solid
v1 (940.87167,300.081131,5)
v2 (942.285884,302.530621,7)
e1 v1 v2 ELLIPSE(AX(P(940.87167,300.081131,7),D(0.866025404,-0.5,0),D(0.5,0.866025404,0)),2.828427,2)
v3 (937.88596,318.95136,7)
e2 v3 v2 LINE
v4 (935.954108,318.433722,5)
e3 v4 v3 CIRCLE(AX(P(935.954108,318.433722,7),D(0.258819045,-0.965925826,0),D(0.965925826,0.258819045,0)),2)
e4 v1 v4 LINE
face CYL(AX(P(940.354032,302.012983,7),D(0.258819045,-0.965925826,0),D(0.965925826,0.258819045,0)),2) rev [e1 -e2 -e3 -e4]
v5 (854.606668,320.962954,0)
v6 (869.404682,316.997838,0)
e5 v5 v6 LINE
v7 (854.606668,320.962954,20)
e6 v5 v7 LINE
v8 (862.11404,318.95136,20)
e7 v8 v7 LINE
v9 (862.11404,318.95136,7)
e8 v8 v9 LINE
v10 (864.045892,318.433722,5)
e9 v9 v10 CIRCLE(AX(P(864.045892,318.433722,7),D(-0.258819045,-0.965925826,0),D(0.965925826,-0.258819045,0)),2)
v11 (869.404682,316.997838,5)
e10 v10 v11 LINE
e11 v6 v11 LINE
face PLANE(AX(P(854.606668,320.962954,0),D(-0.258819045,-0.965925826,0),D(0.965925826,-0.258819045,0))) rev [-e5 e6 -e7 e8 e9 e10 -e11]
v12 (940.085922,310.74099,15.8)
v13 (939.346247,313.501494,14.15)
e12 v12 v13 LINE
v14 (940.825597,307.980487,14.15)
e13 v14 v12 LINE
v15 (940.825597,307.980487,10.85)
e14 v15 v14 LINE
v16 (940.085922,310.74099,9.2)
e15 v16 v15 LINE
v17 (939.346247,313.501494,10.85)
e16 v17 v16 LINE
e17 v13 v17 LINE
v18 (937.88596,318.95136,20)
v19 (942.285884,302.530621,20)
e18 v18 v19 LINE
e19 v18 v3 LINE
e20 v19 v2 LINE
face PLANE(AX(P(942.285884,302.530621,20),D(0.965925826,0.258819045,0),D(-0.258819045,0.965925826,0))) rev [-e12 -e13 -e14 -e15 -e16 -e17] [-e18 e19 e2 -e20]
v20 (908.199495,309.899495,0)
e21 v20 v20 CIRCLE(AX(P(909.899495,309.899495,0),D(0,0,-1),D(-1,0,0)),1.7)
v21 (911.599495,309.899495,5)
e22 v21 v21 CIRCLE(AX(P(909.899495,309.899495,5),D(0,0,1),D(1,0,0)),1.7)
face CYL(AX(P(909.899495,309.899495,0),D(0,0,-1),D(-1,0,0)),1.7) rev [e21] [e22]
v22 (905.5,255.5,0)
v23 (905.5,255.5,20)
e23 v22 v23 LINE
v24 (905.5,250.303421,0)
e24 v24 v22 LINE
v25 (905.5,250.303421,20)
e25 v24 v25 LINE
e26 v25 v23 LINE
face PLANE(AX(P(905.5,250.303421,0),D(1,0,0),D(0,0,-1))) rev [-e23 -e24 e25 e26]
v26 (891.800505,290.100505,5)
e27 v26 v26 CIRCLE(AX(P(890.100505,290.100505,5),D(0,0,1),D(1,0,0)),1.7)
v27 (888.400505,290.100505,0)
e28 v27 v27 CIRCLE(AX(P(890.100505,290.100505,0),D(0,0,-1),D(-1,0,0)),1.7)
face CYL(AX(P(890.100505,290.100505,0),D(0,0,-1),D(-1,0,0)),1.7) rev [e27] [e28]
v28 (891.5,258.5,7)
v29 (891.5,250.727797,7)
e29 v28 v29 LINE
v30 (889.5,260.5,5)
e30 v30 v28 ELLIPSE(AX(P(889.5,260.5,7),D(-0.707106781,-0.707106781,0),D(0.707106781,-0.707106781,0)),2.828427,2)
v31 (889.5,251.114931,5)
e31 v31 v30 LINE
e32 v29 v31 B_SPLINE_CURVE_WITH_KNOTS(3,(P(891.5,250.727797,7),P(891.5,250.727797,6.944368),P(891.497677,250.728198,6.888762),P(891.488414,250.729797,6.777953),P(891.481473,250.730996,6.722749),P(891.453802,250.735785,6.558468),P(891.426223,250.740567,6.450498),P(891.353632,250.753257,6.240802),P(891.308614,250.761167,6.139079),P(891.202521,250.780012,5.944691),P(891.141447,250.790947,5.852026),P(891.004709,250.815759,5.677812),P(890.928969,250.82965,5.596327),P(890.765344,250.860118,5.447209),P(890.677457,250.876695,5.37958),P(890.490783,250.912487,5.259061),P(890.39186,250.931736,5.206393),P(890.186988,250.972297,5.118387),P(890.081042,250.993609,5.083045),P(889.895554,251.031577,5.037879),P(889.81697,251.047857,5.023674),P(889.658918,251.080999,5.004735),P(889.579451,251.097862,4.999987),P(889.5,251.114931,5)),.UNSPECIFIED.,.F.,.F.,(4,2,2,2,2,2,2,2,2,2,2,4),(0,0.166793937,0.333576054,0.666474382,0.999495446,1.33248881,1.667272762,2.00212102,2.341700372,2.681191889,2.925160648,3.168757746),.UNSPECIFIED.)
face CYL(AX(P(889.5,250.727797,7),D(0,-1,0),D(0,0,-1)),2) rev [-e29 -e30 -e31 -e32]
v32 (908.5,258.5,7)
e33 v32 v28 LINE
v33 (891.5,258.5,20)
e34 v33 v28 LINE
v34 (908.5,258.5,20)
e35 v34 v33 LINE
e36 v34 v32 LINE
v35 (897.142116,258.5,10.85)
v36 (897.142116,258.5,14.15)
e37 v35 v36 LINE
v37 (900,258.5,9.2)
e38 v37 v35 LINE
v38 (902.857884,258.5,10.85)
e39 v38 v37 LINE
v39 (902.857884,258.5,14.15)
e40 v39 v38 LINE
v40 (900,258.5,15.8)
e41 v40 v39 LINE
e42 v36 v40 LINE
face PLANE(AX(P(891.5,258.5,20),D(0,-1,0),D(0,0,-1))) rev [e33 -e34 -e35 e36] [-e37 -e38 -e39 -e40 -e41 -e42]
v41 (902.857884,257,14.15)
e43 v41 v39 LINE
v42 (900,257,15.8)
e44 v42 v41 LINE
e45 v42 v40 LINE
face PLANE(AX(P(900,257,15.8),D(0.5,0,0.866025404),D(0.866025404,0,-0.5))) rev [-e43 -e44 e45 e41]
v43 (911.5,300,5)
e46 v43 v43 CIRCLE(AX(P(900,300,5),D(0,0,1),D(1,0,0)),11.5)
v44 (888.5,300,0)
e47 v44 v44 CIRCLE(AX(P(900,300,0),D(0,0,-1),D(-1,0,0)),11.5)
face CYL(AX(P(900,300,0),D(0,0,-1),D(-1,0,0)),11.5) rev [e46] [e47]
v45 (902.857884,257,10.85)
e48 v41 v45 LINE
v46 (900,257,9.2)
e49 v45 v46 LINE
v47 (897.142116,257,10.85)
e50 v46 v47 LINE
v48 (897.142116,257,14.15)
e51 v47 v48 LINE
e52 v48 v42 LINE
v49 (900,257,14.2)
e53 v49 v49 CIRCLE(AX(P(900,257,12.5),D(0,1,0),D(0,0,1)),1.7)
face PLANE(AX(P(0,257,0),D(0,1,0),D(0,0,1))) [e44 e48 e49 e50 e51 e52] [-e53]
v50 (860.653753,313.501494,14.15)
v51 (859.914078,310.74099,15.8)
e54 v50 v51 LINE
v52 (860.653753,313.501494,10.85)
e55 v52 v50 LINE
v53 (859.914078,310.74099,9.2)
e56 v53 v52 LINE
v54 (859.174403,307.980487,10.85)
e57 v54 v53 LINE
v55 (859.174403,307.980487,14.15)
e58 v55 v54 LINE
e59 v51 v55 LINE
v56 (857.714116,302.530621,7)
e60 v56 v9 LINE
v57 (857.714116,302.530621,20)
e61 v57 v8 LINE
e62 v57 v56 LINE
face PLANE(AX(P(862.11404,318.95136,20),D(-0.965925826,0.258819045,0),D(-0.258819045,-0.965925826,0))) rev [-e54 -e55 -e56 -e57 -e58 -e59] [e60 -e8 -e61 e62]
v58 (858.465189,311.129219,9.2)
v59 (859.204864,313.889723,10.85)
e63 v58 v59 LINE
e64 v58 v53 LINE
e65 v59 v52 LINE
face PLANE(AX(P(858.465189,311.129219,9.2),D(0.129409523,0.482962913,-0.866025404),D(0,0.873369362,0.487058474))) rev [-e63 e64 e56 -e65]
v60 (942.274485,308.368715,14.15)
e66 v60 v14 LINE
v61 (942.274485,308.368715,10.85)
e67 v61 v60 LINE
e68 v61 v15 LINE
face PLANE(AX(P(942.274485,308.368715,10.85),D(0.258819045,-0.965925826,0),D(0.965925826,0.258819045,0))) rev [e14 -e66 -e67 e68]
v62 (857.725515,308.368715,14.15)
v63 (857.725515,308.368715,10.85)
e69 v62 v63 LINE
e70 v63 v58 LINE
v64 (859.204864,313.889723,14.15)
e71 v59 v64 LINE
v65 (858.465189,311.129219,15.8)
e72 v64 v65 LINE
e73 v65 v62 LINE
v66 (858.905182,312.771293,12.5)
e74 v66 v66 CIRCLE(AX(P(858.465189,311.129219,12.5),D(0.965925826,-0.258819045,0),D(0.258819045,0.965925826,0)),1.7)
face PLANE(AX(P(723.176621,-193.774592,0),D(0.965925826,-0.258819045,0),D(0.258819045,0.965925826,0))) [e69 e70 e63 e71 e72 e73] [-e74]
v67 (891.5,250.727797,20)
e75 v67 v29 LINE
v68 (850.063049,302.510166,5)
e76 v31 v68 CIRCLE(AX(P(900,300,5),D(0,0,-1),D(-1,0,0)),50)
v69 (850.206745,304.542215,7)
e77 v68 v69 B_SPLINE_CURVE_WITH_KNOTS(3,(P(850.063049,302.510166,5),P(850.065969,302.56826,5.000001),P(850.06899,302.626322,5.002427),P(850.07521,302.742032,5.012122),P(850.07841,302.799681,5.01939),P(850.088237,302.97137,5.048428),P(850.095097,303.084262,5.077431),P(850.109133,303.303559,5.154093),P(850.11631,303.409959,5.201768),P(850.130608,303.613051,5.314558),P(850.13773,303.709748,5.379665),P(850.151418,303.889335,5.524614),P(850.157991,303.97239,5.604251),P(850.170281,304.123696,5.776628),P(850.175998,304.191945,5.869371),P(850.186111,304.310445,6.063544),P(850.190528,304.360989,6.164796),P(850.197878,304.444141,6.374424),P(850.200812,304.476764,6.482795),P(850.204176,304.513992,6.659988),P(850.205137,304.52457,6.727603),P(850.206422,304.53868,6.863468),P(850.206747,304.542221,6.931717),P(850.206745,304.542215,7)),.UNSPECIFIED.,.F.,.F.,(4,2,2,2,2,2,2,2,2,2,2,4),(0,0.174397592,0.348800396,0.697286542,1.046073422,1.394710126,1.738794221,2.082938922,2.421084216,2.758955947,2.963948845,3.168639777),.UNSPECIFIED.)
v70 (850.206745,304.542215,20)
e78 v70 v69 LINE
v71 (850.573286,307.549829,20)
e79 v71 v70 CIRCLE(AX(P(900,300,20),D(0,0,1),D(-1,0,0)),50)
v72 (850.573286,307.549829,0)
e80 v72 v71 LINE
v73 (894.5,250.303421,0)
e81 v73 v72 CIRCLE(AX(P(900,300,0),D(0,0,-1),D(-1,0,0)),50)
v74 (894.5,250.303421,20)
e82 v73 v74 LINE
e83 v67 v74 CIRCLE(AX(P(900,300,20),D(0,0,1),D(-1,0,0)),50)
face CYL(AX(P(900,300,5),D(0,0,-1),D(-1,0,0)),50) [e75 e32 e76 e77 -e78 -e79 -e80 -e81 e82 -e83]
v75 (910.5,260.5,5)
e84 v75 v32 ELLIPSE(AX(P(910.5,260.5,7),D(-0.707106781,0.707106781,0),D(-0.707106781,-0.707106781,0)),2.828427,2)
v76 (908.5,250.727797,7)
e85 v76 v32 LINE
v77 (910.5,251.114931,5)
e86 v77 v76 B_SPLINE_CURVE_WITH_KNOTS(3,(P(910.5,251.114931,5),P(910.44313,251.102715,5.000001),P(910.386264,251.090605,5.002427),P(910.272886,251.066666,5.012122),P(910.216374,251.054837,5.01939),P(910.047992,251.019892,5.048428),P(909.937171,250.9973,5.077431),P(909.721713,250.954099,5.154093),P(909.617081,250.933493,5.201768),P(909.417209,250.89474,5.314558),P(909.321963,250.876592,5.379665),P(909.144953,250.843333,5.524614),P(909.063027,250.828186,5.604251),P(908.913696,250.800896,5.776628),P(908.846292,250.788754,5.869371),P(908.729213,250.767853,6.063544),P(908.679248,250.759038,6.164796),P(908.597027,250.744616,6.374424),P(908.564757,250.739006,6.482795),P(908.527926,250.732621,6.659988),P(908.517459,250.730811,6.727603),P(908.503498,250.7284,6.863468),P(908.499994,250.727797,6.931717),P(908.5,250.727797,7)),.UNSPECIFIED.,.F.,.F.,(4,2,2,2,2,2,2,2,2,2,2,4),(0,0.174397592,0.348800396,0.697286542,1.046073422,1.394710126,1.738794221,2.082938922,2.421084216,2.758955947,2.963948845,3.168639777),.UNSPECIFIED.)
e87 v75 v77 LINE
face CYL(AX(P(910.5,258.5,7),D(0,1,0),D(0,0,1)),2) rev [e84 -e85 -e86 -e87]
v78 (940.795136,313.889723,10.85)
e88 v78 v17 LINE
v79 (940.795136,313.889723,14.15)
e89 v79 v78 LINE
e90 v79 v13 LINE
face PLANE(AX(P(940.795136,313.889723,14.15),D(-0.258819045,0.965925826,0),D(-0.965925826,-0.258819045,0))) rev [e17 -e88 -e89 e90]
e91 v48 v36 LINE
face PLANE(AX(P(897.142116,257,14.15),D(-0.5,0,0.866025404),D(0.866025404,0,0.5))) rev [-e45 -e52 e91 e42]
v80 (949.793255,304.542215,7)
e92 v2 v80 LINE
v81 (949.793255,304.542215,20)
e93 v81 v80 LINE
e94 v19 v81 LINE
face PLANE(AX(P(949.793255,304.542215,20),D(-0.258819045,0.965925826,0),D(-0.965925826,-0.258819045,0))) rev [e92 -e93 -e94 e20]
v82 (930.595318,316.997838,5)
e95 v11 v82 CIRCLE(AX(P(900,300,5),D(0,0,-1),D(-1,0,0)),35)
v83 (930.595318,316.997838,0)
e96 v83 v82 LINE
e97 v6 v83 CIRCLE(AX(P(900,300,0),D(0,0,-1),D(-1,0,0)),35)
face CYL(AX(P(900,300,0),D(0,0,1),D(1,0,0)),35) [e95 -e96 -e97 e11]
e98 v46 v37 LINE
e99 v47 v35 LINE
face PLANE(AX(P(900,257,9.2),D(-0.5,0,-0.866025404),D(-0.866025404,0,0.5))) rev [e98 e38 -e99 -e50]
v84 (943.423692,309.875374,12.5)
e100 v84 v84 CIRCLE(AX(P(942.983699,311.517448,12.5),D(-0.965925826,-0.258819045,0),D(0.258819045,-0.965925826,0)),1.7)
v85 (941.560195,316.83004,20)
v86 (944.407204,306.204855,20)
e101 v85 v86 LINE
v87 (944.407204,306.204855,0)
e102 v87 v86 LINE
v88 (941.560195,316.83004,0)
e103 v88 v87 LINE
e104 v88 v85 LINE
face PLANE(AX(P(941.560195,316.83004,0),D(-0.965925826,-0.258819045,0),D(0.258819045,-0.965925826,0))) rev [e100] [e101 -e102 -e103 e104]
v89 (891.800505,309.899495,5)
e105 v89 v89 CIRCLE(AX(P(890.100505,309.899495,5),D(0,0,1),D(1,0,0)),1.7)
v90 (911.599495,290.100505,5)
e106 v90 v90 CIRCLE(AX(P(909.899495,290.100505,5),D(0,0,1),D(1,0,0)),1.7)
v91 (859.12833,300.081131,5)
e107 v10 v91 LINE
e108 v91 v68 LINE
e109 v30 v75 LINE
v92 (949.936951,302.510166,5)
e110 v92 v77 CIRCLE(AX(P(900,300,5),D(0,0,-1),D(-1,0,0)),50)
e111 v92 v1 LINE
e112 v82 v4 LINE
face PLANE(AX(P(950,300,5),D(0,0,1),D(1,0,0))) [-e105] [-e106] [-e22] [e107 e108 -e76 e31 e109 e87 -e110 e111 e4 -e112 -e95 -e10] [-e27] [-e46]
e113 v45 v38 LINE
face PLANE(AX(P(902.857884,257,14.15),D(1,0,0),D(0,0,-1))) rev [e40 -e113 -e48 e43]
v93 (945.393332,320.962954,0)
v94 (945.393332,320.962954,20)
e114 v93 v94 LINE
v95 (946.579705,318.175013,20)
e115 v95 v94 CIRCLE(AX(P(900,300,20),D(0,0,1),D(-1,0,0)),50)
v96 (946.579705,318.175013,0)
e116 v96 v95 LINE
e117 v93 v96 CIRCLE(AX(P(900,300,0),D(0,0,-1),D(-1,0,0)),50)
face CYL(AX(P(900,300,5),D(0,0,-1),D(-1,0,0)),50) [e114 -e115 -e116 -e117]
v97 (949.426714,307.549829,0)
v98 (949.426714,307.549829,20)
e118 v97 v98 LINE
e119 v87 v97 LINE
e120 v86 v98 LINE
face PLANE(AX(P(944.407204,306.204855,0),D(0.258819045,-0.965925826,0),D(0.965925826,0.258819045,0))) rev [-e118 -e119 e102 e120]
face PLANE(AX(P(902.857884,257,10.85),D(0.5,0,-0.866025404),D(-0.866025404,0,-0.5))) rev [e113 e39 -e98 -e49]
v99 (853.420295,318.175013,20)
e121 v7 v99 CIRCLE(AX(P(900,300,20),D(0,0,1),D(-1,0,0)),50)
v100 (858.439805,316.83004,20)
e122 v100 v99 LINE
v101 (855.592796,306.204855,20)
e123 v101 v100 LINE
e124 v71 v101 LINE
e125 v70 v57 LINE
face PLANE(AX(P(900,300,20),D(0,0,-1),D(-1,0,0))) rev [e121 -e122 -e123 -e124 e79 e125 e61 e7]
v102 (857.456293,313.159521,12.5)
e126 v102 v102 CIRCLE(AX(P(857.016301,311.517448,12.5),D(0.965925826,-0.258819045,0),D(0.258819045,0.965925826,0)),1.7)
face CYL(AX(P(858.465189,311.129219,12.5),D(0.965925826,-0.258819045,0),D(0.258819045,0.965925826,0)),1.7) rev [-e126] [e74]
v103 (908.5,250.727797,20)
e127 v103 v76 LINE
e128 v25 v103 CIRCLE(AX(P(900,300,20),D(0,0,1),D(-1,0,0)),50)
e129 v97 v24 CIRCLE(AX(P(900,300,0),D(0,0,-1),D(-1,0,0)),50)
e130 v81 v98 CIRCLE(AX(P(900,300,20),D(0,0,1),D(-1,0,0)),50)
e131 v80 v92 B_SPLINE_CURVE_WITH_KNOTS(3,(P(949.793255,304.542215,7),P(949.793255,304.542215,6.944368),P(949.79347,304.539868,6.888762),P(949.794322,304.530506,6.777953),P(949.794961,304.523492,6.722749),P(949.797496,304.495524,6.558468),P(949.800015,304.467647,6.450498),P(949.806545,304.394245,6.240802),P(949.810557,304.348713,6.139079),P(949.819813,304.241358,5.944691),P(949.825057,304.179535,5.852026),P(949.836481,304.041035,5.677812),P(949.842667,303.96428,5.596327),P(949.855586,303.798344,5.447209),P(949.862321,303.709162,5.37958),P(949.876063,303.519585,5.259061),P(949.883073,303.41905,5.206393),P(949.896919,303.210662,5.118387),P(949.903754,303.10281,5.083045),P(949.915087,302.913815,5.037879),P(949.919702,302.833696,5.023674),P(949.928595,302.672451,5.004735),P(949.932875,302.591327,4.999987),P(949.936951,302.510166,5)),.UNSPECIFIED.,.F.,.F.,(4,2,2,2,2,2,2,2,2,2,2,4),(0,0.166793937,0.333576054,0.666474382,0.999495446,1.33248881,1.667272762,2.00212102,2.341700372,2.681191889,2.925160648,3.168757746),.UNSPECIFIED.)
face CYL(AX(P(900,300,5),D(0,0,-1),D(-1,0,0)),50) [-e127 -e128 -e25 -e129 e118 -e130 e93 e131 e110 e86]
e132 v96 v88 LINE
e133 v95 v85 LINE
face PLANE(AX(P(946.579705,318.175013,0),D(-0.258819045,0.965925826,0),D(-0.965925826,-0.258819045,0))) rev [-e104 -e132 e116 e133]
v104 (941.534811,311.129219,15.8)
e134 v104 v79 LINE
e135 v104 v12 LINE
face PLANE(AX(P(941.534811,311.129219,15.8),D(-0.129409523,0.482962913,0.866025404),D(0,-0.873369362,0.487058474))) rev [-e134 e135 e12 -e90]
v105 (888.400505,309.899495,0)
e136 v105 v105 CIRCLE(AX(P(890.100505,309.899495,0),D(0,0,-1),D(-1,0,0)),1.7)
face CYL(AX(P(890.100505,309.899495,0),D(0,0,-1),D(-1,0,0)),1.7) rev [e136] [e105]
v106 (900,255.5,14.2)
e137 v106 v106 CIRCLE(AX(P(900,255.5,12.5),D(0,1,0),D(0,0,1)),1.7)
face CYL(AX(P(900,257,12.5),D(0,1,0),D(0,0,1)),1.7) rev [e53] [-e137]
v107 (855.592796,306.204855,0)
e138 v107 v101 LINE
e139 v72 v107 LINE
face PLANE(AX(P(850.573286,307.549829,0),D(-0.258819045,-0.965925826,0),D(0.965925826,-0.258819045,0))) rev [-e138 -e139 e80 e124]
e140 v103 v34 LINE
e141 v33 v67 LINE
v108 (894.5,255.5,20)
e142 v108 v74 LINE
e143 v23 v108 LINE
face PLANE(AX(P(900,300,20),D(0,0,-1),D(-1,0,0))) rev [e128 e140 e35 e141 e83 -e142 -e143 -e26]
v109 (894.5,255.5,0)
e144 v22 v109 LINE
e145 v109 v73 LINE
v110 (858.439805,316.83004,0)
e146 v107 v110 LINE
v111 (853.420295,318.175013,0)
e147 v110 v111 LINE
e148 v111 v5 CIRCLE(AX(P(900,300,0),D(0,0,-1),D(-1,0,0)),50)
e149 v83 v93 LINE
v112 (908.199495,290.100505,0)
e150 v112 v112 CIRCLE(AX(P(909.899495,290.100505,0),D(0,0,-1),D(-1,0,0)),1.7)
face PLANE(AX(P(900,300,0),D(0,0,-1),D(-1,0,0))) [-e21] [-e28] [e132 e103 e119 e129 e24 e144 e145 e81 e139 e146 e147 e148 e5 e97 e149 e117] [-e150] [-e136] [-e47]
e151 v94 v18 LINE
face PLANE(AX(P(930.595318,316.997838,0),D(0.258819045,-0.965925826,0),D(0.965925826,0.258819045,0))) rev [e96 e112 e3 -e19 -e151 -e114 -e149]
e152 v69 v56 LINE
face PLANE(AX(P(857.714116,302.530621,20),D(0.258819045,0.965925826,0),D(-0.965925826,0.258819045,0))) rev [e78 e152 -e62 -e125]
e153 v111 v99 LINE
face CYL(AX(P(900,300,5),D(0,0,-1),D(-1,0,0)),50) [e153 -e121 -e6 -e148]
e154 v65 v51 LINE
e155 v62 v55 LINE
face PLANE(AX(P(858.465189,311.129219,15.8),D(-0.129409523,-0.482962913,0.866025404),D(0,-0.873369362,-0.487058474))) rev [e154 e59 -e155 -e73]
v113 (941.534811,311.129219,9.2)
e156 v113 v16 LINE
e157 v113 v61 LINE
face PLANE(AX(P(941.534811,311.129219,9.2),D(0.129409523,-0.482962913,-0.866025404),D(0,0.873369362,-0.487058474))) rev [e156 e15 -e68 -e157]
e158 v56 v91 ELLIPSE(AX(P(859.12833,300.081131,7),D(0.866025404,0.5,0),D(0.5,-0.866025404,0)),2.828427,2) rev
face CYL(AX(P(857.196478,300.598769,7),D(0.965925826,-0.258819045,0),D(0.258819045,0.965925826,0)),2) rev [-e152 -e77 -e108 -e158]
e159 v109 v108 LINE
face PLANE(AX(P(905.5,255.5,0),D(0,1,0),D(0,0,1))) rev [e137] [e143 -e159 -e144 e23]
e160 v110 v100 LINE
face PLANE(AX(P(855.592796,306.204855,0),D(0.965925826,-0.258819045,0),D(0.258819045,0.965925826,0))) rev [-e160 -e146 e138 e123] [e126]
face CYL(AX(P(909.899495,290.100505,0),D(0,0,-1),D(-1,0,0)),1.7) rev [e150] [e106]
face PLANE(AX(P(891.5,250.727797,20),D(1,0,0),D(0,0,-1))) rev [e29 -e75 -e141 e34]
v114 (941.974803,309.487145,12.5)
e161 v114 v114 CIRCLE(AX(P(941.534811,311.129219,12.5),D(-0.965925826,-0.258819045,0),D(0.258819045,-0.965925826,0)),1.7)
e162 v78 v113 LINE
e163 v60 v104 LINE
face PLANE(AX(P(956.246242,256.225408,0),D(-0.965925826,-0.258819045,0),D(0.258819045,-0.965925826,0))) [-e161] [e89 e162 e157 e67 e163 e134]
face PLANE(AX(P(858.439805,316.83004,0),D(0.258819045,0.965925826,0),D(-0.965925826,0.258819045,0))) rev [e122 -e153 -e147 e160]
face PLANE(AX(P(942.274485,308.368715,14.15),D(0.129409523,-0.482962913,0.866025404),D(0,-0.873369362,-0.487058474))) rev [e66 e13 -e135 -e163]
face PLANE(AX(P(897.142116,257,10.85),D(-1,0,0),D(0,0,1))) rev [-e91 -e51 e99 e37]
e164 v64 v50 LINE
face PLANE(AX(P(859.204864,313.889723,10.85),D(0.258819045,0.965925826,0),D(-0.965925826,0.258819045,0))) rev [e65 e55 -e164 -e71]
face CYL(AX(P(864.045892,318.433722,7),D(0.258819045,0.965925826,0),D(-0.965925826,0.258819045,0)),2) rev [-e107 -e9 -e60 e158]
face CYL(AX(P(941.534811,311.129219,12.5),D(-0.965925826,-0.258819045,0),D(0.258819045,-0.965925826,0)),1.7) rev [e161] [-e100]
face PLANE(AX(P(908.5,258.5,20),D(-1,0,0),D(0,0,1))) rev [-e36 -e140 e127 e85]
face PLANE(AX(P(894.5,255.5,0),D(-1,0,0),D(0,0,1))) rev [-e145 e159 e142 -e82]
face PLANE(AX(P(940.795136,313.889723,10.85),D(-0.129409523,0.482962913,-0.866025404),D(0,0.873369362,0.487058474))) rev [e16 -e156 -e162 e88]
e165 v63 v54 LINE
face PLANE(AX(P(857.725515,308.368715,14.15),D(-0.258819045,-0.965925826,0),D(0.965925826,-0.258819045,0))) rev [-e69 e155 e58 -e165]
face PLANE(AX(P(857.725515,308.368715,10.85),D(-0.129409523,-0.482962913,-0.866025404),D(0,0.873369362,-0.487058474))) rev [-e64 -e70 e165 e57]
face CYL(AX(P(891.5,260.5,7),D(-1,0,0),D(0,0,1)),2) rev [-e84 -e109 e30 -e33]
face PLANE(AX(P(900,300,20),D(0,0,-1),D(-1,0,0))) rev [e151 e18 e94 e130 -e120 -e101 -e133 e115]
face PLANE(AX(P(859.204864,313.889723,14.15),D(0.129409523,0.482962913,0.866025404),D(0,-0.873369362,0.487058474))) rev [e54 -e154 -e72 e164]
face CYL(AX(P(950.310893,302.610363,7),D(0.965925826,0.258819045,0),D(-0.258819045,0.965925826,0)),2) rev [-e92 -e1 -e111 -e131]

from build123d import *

# Parameters (mm, degrees)
CUT_EXTRUDE_1_DEPTH         = 1013.4351831105043
EXTRUDE_START               = 14.999999999999998
EXTRUDE_1_DEPTH             = 14.999999999999998
CUT_EXTRUDE_2_DEPTH         = 1008.5341185289956
EXTRUDE_2_DEPTH             = 14.999999999999998
CUT_EXTRUDE_3_DEPTH         = 1008.5341185289956
EXTRUDE_3_DEPTH             = 14.999999999999998
CUT_EXTRUDE_4_DEPTH         = 1008.5341185289956
CUT_EXTRUDE_5_DEPTH         = 1.5000000000000013
CUT_EXTRUDE_6_DEPTH         = 1.500000000000375
CUT_EXTRUDE_7_DEPTH         = 1.500000000000482
HOLE_WIZARD_23_0_23_1_D     = 23
HOLE_WIZARD_23_0_23_1_DEPTH = 20
HOLE_WIZARD_3_4_3_4_1_D     = 3.4
HOLE_WIZARD_3_4_3_4_1_DEPTH = 20
HOLE_WIZARD_3_4_3_4_2_D     = 3.4
HOLE_WIZARD_3_4_3_4_2_DEPTH = 6.696579359
HOLE_WIZARD_3_4_3_4_3_D     = 3.4
HOLE_WIZARD_3_4_3_4_3_DEPTH = 14.354957893
HOLE_WIZARD_3_4_3_4_4_D     = 3.4
HOLE_WIZARD_3_4_3_4_4_DEPTH = 14.354957893
FILLET_1_R                  = 2


with BuildPart() as part:
    # 草图1 → 旋转1 (revolve)
    with BuildSketch(Plane.XZ.offset(-300), mode=Mode.PRIVATE) as revolve_1_sk:
        Polygon((950.0000000000001, 5), (900, 4.999999999999999), (900, 0), (950.0000000000001, 0), align=None)
    revolve(revolve_1_sk.sketch.rotate(Axis((900, 300, 4.999999999999999), (0, 0, -1)), 180), axis=Axis((900, 300, 4.999999999999999), (0, 0, -1)))

    # 草图2 → 切除-拉伸1 (cut, through all)
    with BuildSketch(Plane.XY.offset(4.999999999999999)):
        with BuildLine():
            Line((854.6066683745289, 320.9629540842885), (869.404681855504, 316.99783832247647))
            ThreePointArc((869.404681855504, 316.99783832247647), (900, 334.99999999999966), (930.5953181444959, 316.99783832247647))
            Line((930.5953181444959, 316.99783832247647), (945.393331625471, 320.9629540842885))
            ThreePointArc((945.393331625471, 320.9629540842885), (900, 349.9999999999997), (854.6066683745289, 320.9629540842885))
        make_face()
    extrude(amount=-CUT_EXTRUDE_1_DEPTH, mode=Mode.SUBTRACT)

    # 草图3 → 凸台-拉伸1 (add)
    with BuildSketch(Plane.XY.offset(4.999999999999999).offset(EXTRUDE_START)):
        with BuildLine():
            Line((854.6066683745289, 320.9629540842885), (862.114040092375, 318.9513598952115))
            Line((862.114040092375, 318.9513598952115), (857.7141163256321, 302.5306208482976))
            Line((857.7141163256321, 302.5306208482976), (850.206744607786, 304.5422150373745))
            ThreePointArc((850.206744607786, 304.5422150373745), (851.7037086855465, 312.9409522551258), (854.6066683745289, 320.9629540842885))
        make_face()
    extrude(amount=-EXTRUDE_1_DEPTH)

    # 草图4 → 切除-拉伸2 (cut, through all)
    with BuildSketch(Plane.XY.offset(19.999999999999996)):
        with BuildLine():
            Line((850.573285770712, 307.549829170006), (855.592795982073, 306.204855462472))
            Line((855.592795982073, 306.204855462472), (858.4398054782009, 316.830039551652))
            Line((858.4398054782009, 316.830039551652), (853.4202952668401, 318.175013259186))
            ThreePointArc((853.4202952668401, 318.175013259186), (851.7037086855471, 312.9409522551259), (850.573285770712, 307.549829170006))
        make_face()
    extrude(amount=-CUT_EXTRUDE_2_DEPTH, mode=Mode.SUBTRACT)

    # 草图5 → 凸台-拉伸2 (add)
    with BuildSketch(Plane.XY.offset(4.999999999999999).offset(EXTRUDE_START)):
        with BuildLine():
            Line((891.5, 250.7277968830295), (891.5, 258.5))
            Line((891.5, 258.5), (908.5, 258.5))
            Line((908.5, 258.5), (908.5, 250.7277968830295))
            ThreePointArc((908.5, 250.7277968830295), (900, 250.00000000000003), (891.5, 250.7277968830295))
        make_face()
    extrude(amount=-EXTRUDE_2_DEPTH)

    # 草图6 → 切除-拉伸3 (cut, through all)
    with BuildSketch(Plane.XY.offset(19.999999999999996)):
        with BuildLine():
            Line((905.5, 250.30342064085298), (905.5, 255.5))
            Line((905.5, 255.5), (894.5, 255.5))
            Line((894.5, 255.5), (894.5, 250.30342064085298))
            ThreePointArc((894.5, 250.30342064085298), (900, 250.00000000000003), (905.5, 250.30342064085298))
        make_face()
    extrude(amount=-CUT_EXTRUDE_3_DEPTH, mode=Mode.SUBTRACT)

    # 草图7 → 凸台-拉伸3 (add)
    with BuildSketch(Plane.XY.offset(4.999999999999999).offset(EXTRUDE_START)):
        with BuildLine():
            Line((949.7932553922141, 304.5422150373745), (942.285883674368, 302.5306208482975))
            Line((942.285883674368, 302.5306208482975), (937.885959907625, 318.9513598952115))
            Line((937.885959907625, 318.9513598952115), (945.393331625471, 320.9629540842885))
            ThreePointArc((945.393331625471, 320.9629540842885), (948.2962913144532, 312.94095225512575), (949.7932553922141, 304.5422150373745))
        make_face()
    extrude(amount=-EXTRUDE_3_DEPTH)

    # 草图8 → 切除-拉伸4 (cut, through all)
    with BuildSketch(Plane.XY.offset(19.999999999999996)):
        with BuildLine():
            Line((946.5797047331605, 318.17501325918545), (941.5601945218003, 316.83003955165213))
            Line((941.5601945218003, 316.83003955165213), (944.4072040179273, 306.20485546247204))
            Line((944.4072040179273, 306.20485546247204), (949.4267142292881, 307.5498291700056))
            ThreePointArc((949.4267142292881, 307.5498291700056), (948.2962913144534, 312.94095225512547), (946.5797047331605, 318.17501325918545))
        make_face()
    extrude(amount=-CUT_EXTRUDE_4_DEPTH, mode=Mode.SUBTRACT)

    # 草图9 → 切除-拉伸5 (cut)
    with BuildSketch(Plane(origin=(0, 258.5, 0), x_dir=(-1, 0, 0), z_dir=(0, 1, 0))):
        Polygon((-902.857883832489, 14.149999999999999), (-902.857883832489, 10.85), (-900, 9.2), (-897.1421161675111, 10.85), (-897.1421161675121, 14.149999999999999), (-900, 15.8), align=None)
    extrude(amount=-CUT_EXTRUDE_5_DEPTH, mode=Mode.SUBTRACT)

    # 草图10 → 切除-拉伸6 (cut)
    with BuildSketch(Plane(origin=(724.6255099119961, -194.16282019591551, 0), x_dir=(0, 0, -1), z_dir=(0.9659258262890664, -0.25881904510252784, 0))):
        Polygon((-14.149999999999999, 519.8570046465061), (-10.85, 519.8570046465061), (-9.2, 522.7148884789947), (-10.85, 525.5727723114834), (-14.149999999999999, 525.5727723114834), (-15.8, 522.7148884789947), align=None)
    extrude(amount=-CUT_EXTRUDE_6_DEPTH, mode=Mode.SUBTRACT)

    # 草图11 → 切除-拉伸7 (cut)
    with BuildSketch(Plane(origin=(954.7973534939916, 255.83717980410037, 0), x_dir=(0, 0, 1), z_dir=(-0.9659258262890652, -0.2588190451025323, 0))):
        Polygon((10.85, 59.69849112692882), (9.2, 56.8406072944401), (10.85, 53.98272346195163), (14.149999999999999, 53.98272346195163), (15.8, 56.8406072944401), (14.149999999999999, 59.69849112692882), align=None)
    extrude(amount=-CUT_EXTRUDE_7_DEPTH, mode=Mode.SUBTRACT)

    # Ø23.0 (23) 直径孔1
    with Locations(Plane(origin=(0, 0, 0), x_dir=(-1, 0, 0), z_dir=(0, 0, -1))):
        with Locations((-900, 300)):
            Hole(HOLE_WIZARD_23_0_23_1_D / 2, depth=HOLE_WIZARD_23_0_23_1_DEPTH)

    # Ø3.4 (3.4) 直径孔1
    with Locations(Plane(origin=(0, 0, 0), x_dir=(-1, 0, 0), z_dir=(0, 0, -1))):
        with Locations((-909.899494937, 290.100505063), (-909.899494937, 309.899494937), (-890.100505063, 309.899494937), (-890.100505063, 290.100505063)):
            Hole(HOLE_WIZARD_3_4_3_4_1_D / 2, depth=HOLE_WIZARD_3_4_3_4_1_DEPTH)

    # Ø3.4 (3.4) 直径孔2
    with Locations(Plane(origin=(0, 257, 0), x_dir=(1, 0, 0), z_dir=(0, 1, 0))):
        with Locations((900, -12.5)):
            Hole(HOLE_WIZARD_3_4_3_4_2_D / 2, depth=HOLE_WIZARD_3_4_3_4_2_DEPTH)

    # Ø3.4 (3.4) 直径孔3
    with Locations(Plane(origin=(723.1766211725698, -193.77459162825534, 0), x_dir=(0, 0, -1), z_dir=(0.9659258262890692, -0.2588190451025174, 0))):
        with Locations((-12.5, 522.714888479)):
            Hole(HOLE_WIZARD_3_4_3_4_3_D / 2, depth=HOLE_WIZARD_3_4_3_4_3_DEPTH)

    # Ø3.4 (3.4) 直径孔4
    with Locations(Plane(origin=(956.2462422334311, 256.22540837172977, 0), x_dir=(0, 0, 1), z_dir=(-0.9659258262890719, -0.25881904510250775, 0))):
        with Locations((12.5, 56.840607294)):
            Hole(HOLE_WIZARD_3_4_3_4_4_D / 2, depth=HOLE_WIZARD_3_4_3_4_4_DEPTH)

    # 圆角1
    fillet_1_edges = [part.edges().sort_by_distance(p)[0] for p in [
        (853.9604304667091, 303.536417942836, 4.999999999999999),
        (859.9140782090035, 310.74099037175455, 4.999999999999999),
        (908.5, 254.61389844151475, 4.999999999999999),
        (900, 258.5, 4.999999999999999),
        (891.5, 254.61389844151475, 4.999999999999999),
        (940.0859217909965, 310.7409903717545, 4.999999999999999),
        (946.0395695332911, 303.536417942836, 4.999999999999999),
    ]]
    fillet(fillet_1_edges, radius=FILLET_1_R)


solid = part.part
